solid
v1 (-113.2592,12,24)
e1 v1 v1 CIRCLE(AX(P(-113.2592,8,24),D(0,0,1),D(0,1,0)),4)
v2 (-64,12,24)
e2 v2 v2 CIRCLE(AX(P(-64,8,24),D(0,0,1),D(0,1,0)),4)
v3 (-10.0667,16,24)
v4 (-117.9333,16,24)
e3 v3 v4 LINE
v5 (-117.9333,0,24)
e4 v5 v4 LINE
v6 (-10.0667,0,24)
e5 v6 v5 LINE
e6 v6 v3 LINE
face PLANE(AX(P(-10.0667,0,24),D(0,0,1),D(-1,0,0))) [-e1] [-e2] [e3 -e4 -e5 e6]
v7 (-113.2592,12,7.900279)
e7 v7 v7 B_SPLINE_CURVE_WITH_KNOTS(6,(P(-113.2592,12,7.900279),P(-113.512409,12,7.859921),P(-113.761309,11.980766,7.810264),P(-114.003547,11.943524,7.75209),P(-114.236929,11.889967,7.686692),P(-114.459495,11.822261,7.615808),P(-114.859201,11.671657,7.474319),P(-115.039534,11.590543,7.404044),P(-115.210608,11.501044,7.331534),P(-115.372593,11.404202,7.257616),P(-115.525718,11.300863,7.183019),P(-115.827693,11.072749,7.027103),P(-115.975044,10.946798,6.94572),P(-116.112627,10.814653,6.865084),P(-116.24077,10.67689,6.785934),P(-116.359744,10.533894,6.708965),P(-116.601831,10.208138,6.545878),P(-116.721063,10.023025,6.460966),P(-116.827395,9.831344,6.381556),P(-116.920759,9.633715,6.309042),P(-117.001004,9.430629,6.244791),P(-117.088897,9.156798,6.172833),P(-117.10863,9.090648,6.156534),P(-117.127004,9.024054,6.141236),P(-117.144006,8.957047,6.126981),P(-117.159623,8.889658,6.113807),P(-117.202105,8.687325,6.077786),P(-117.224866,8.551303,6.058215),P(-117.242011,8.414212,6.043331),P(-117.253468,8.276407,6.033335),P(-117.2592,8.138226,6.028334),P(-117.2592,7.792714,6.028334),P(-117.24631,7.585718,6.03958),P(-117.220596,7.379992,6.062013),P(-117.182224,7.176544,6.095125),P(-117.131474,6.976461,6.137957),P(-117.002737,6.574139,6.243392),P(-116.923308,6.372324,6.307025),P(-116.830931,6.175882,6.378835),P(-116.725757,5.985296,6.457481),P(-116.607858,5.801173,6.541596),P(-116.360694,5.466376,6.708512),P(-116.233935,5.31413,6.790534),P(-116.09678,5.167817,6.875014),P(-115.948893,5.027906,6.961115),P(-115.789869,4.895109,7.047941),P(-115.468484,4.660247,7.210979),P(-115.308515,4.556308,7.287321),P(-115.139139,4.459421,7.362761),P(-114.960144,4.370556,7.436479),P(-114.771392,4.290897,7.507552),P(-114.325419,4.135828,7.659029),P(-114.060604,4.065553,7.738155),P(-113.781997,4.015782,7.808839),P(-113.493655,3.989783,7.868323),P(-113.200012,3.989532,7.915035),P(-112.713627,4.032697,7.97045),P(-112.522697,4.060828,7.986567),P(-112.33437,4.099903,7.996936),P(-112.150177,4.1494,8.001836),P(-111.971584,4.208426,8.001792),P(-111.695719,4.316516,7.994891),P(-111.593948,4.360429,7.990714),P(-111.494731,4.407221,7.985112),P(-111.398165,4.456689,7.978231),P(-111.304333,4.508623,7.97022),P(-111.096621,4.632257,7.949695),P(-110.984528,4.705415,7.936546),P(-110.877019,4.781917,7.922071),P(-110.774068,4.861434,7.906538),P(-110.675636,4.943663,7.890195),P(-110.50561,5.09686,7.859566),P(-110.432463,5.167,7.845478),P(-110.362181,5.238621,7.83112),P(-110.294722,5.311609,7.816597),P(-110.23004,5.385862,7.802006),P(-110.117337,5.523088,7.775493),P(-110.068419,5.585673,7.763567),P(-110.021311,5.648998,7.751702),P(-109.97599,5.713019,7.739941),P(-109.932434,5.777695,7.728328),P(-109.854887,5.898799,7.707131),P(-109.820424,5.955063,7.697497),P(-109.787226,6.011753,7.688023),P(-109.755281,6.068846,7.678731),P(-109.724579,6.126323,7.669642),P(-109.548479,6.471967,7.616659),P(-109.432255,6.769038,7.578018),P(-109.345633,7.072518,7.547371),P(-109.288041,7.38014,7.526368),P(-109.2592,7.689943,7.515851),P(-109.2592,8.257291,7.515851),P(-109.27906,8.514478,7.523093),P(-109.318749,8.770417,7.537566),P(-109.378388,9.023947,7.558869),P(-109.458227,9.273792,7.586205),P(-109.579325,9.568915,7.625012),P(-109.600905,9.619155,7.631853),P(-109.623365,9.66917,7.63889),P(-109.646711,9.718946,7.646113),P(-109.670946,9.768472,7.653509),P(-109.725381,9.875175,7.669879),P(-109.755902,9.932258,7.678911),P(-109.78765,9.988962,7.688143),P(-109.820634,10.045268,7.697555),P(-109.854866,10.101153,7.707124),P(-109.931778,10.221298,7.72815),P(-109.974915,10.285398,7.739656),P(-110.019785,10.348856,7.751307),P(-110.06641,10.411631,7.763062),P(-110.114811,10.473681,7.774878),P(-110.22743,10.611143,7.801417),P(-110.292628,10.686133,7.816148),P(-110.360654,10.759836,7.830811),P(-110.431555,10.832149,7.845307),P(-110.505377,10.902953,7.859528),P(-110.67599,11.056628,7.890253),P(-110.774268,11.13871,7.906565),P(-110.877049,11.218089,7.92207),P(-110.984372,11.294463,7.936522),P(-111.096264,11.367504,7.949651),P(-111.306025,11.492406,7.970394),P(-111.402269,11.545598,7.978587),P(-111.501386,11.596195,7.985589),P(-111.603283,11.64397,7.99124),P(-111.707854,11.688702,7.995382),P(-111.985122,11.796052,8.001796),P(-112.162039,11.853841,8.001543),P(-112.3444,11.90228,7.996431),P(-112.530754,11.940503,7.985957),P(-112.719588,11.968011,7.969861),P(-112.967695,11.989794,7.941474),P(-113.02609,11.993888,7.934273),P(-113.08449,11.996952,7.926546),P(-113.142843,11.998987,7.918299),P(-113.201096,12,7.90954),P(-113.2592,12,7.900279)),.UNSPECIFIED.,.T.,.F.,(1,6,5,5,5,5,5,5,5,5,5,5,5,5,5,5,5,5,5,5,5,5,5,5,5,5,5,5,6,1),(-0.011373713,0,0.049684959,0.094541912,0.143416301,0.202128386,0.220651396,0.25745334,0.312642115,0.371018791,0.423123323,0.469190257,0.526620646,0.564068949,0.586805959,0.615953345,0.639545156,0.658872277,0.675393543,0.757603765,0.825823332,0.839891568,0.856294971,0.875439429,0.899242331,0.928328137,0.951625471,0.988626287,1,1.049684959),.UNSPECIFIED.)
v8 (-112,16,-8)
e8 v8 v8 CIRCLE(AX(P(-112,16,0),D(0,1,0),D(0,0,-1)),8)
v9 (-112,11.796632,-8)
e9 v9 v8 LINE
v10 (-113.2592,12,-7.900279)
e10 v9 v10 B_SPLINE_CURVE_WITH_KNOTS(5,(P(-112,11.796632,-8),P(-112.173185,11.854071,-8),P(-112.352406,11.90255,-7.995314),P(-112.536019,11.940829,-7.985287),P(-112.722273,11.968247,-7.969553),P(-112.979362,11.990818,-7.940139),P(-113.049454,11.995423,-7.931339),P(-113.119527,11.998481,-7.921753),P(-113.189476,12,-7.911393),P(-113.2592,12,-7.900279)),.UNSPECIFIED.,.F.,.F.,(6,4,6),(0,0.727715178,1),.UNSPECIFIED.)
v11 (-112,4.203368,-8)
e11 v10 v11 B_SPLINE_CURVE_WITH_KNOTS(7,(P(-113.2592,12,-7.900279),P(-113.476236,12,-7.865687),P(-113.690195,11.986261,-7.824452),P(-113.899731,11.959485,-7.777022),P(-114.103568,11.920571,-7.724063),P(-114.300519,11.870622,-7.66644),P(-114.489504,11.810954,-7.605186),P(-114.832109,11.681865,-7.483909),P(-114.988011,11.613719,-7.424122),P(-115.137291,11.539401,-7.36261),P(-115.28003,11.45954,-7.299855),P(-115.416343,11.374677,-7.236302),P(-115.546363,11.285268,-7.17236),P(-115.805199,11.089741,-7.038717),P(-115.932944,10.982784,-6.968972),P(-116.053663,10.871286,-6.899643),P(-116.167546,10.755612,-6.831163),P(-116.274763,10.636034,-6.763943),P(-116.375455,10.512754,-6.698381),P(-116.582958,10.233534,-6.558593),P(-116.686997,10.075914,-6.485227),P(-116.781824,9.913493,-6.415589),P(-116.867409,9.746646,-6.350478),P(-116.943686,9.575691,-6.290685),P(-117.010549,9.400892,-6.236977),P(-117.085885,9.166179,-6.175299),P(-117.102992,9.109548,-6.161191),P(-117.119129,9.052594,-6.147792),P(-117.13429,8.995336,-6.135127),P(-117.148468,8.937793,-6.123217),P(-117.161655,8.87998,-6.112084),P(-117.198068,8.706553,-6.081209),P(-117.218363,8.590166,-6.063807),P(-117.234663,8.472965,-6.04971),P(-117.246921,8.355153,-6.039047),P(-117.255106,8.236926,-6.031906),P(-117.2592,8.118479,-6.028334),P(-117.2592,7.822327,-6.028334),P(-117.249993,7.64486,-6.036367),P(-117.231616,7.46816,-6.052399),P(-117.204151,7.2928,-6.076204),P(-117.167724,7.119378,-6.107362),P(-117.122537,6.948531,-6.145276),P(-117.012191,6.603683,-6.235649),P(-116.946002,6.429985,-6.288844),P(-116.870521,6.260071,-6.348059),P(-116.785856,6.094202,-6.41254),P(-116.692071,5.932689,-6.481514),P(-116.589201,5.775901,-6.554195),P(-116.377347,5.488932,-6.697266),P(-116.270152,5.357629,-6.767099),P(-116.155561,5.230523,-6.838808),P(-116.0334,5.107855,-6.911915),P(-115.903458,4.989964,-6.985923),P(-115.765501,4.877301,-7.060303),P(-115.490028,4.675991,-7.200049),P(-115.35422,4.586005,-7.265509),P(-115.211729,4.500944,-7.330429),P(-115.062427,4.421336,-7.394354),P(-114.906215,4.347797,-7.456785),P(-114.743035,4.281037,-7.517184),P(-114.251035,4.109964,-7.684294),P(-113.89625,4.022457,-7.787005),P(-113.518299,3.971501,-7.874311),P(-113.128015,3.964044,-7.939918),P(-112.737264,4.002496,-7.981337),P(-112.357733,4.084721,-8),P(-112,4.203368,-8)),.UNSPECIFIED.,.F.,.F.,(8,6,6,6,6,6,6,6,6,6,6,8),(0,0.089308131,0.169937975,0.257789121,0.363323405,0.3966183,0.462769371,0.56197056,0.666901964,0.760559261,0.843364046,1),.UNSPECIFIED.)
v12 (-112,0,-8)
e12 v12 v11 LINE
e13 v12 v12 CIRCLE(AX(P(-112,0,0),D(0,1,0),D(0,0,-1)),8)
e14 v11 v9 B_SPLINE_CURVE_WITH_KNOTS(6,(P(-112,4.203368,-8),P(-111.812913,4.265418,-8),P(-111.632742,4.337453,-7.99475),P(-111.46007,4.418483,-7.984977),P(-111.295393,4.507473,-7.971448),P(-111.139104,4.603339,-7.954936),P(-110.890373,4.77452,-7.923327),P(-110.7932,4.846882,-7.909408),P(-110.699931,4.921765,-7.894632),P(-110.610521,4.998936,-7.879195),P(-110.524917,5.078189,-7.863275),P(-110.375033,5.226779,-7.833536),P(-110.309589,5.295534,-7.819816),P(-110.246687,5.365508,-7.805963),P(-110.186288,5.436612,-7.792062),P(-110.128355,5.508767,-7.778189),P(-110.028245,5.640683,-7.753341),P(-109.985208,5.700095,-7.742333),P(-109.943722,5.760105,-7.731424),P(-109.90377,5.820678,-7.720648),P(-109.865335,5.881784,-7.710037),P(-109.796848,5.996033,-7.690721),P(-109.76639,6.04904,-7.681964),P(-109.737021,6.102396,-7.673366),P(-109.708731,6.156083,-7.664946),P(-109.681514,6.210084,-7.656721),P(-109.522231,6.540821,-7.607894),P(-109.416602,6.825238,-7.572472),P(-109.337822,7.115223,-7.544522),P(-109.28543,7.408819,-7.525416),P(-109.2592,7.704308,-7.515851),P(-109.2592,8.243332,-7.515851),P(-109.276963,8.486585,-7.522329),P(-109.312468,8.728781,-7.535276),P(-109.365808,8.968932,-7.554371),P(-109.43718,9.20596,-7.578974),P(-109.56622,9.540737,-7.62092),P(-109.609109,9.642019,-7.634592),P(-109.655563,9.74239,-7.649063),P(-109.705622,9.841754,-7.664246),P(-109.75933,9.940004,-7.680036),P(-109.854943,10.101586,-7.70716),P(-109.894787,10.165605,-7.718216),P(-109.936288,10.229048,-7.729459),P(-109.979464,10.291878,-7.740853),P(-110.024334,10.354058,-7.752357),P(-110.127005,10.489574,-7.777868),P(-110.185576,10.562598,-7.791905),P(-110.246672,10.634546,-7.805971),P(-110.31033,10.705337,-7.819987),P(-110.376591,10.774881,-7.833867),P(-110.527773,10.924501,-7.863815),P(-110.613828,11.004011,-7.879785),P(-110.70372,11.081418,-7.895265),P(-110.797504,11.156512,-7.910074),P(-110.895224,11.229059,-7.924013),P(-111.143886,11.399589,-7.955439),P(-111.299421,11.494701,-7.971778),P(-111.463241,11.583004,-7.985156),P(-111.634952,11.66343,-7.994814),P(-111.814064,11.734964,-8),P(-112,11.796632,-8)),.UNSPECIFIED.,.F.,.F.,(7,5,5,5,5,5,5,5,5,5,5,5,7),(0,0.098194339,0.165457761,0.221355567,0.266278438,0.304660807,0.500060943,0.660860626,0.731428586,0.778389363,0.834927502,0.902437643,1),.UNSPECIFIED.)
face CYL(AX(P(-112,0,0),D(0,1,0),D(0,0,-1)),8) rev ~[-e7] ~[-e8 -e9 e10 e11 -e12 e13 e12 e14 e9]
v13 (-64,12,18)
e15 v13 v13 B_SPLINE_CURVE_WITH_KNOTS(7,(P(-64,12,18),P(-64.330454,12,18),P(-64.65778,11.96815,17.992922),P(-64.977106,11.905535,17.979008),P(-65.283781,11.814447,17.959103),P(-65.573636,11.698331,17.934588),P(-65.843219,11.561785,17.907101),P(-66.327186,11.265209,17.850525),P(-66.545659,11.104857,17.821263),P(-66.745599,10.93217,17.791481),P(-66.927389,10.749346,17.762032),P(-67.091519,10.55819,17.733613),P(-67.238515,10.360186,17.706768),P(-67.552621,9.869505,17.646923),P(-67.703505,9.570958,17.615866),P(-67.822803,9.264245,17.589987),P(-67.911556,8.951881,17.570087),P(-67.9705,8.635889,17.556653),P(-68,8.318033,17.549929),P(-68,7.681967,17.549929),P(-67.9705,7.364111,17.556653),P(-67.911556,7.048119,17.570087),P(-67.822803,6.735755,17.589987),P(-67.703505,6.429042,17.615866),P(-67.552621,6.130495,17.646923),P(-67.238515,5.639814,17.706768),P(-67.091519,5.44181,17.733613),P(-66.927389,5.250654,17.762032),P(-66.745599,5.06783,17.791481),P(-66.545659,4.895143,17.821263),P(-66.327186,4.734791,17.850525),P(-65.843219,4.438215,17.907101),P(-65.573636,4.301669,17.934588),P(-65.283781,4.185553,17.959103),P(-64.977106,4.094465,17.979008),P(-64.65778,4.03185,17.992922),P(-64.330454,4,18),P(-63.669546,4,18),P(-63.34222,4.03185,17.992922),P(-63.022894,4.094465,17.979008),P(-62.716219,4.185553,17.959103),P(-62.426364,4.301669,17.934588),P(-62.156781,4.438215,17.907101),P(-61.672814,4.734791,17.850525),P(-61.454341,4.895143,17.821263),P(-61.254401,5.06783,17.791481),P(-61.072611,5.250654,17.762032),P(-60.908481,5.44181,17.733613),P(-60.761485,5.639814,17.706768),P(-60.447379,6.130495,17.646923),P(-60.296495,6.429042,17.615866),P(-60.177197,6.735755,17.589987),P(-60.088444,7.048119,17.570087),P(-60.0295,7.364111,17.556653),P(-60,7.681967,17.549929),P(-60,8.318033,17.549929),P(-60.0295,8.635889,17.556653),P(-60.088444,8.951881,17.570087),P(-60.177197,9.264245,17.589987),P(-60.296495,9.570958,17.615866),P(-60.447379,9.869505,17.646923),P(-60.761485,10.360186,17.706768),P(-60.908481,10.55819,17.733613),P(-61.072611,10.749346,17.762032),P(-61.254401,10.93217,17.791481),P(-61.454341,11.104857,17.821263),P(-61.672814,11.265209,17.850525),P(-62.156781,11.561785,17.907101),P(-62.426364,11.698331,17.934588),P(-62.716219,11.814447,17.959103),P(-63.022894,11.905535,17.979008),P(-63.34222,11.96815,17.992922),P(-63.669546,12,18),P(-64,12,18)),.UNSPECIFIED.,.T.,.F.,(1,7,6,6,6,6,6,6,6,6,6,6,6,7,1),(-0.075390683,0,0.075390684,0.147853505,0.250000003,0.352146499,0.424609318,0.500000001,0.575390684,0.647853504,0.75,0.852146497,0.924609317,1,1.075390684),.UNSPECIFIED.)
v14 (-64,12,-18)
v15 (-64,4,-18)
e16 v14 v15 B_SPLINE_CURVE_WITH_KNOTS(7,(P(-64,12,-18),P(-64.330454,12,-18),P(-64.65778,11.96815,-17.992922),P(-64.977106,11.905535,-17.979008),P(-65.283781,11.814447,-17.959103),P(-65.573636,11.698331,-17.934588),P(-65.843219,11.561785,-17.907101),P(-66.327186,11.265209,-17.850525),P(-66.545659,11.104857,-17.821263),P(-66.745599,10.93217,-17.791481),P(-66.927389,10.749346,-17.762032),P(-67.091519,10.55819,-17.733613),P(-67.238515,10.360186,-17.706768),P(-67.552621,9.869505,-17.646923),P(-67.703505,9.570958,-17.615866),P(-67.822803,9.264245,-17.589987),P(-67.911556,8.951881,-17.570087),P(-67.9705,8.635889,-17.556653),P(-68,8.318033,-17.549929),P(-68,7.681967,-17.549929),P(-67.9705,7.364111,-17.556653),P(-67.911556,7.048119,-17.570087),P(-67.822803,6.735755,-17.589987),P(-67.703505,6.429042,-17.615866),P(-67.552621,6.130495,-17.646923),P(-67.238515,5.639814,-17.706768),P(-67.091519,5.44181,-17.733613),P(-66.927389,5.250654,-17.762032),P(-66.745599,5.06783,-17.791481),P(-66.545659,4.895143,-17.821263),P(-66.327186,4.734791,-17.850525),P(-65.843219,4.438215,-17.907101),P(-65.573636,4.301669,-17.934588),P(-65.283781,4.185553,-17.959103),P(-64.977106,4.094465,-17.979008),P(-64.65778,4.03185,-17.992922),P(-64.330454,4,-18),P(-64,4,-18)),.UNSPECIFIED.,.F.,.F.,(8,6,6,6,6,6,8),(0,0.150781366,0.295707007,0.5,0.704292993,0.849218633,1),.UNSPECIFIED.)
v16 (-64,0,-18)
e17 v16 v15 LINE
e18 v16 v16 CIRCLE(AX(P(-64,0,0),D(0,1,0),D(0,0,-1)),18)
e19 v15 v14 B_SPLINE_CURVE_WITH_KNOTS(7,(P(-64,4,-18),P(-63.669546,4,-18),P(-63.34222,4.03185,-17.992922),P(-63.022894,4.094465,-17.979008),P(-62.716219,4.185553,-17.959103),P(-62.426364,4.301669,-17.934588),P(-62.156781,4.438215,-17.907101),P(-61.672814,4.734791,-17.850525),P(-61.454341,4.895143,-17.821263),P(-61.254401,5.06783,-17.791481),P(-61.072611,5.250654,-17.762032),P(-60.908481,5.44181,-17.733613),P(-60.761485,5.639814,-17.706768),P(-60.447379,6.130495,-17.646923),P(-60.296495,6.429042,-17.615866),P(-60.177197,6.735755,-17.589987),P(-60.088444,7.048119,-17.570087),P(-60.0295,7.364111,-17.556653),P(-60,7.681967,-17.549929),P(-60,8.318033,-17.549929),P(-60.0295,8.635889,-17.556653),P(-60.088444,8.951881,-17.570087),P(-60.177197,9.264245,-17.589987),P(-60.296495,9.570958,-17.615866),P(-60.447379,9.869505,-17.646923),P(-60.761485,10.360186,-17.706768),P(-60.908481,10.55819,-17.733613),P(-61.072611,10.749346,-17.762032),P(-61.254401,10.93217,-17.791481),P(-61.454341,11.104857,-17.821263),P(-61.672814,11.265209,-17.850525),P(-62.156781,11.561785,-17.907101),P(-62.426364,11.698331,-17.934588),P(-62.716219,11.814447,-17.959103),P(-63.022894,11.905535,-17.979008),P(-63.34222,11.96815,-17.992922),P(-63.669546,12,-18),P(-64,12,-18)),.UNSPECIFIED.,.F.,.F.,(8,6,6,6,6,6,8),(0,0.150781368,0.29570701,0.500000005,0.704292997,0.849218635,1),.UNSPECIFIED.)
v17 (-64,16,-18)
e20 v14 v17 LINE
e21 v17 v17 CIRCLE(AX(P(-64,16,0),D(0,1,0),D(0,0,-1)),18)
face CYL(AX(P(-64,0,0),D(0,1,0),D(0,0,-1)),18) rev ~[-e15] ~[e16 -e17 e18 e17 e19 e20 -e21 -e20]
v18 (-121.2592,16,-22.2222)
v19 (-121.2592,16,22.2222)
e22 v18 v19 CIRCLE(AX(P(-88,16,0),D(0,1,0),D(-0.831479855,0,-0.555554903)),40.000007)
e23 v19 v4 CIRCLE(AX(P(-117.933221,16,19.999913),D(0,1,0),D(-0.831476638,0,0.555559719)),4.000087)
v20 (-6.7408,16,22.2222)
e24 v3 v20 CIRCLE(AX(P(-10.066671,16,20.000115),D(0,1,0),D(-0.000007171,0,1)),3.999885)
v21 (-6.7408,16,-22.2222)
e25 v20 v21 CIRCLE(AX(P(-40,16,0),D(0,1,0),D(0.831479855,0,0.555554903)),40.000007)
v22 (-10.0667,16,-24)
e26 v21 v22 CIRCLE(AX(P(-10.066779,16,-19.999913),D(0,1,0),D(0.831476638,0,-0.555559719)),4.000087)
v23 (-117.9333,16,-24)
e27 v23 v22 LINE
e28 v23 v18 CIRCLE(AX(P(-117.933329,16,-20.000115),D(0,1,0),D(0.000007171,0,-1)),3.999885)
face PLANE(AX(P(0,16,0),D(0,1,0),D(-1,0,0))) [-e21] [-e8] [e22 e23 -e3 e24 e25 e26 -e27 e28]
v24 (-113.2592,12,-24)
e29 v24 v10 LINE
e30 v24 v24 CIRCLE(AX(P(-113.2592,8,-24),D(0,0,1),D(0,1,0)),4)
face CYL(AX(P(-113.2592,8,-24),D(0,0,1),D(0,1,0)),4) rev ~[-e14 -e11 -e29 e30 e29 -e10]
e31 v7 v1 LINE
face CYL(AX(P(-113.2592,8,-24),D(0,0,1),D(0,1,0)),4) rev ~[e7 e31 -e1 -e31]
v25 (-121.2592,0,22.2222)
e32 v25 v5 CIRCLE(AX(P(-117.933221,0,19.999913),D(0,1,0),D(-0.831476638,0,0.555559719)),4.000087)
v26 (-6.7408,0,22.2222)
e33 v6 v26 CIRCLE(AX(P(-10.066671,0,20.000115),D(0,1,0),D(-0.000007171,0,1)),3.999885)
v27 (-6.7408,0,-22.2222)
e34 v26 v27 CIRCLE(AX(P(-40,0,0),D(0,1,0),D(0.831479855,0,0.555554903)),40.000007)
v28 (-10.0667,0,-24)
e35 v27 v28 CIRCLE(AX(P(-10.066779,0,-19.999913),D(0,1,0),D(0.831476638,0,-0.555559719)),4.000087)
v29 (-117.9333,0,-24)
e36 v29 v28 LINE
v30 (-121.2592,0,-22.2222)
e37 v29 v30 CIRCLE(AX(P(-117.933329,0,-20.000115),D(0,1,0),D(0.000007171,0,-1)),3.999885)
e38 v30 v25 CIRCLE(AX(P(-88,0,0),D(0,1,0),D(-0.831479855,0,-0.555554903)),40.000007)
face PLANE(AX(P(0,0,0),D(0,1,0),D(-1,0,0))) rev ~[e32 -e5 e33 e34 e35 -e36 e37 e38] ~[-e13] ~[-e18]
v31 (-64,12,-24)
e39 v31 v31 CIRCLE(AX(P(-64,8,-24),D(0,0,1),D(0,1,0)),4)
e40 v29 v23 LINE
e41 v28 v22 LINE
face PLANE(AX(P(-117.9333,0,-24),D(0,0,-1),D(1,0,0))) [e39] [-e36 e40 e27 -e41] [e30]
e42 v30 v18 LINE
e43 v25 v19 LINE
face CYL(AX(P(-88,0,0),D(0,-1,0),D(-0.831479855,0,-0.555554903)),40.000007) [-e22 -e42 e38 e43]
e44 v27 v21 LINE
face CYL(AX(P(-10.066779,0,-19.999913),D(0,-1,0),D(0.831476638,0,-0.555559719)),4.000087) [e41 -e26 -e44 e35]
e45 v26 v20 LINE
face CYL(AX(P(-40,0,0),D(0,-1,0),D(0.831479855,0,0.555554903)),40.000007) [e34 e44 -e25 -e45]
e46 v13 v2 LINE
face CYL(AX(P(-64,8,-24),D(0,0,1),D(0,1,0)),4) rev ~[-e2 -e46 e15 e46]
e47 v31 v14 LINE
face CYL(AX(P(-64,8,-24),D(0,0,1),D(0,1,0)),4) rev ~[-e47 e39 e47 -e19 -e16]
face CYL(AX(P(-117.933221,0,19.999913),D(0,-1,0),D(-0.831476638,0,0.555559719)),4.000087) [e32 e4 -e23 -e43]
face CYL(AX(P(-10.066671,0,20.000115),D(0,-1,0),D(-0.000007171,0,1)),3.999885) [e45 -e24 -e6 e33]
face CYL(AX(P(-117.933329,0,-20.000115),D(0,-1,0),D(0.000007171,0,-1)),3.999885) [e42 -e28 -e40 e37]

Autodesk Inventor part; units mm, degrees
ref_plane "YZ Plane" through (0, 0, 0) normal (1, 0, 0) x (0, 1, 0)
ref_plane "XZ Plane" through (0, 0, 0) normal (0, 1, 0) x (-1, 0, 0)
ref_plane "XY Plane" through (0, 0, 0) normal (0, 0, 1) x (1, 0, 0)
sketch "Skizze1" plane through (0, 0, 0) normal (0, 1, 0) x (-1, 0, 0)
  line L0 (10.0667, 24) -> (117.9333, 24)
  line L1 (117.9333, -24) -> (10.0667, -24)
  line L2 (0, 0) -> (128, 0) construction
  arc A0 (6.7408, 22.2222) -> (6.7408, -22.2222) centre (40, 0) ccw
  arc A1 (121.2592, -22.2222) -> (121.2592, 22.2222) centre (88, 0) ccw
  arc A2 (121.2592, 22.2222) -> (117.9333, 24) centre (117.9333, 20) ccw
  arc A3 (117.9333, -24) -> (121.2592, -22.2222) centre (117.9333, -20) ccw
  arc A4 (6.7408, -22.2222) -> (10.0667, -24) centre (10.0667, -20) ccw
  arc A5 (10.0667, 24) -> (6.7408, 22.2222) centre (10.0667, 20) ccw
  point P0 (120, -24)
  point P1 (120, -24)
  point P2 (120, -24)
  point P3 (120, 24)
  point P4 (120, 24)
  point P5 (120, 24)
  point P6 (8, -24)
  point P7 (8, -24)
  point P8 (8, -24)
  point P9 (8, 24)
  point P10 (8, 24)
  point P11 (8, 24)
  point P12 (128, 0)
  dimension "d1" = 0
  dimension "d3" = 0
  dimension "d2" = 48
  dimension "d24" = 128
  dimension "d25" = 4
  dimension "d26" = 40
  dimension "d27" = 40
extrude "Extrusion1" add sketch "Skizze1" along normal blind 16
sketch "Skizze2" plane through (0, 0, 0) normal (0, 1, 0) x (1, 0, 0)
  line L0 (-117.9333, -24) -> (-10.0667, -24) projected
  arc A0 (-121.2592, 22.2222) -> (-121.2592, -22.2222) centre (-88, 0) ccw projected
  point P0 (0, 0)
  point P1 (-64, 0)
  point P2 (2, 0)
  point P3 (-112, 0)
  point P4 (2, 0)
  point P5 (-128, 0)
  point P6 (-64, -24)
  dimension "d29" = 48
hole "Bohrung1" at (-64, 0, 0) direction (0, 1, 0) diameter 36 depth 16
hole "Bohrung2" at (-112, 0, 0) direction (0, 1, 0) diameter 16 depth 16
sketch "Skizze3" plane through (-10.0667, 0, -24) normal (0, 0, -1) x (-1, 0, 0)
  line L0 (0, 0) -> (0, 16) projected
  line L1 (111.1924, 0) -> (111.1924, 16) projected
  line L2 (0, 0) -> (107.8665, 0) projected
  point P0 (-10.0667, 0)
  point P1 (103.1924, 8)
  point P2 (0, 8)
  point P3 (53.9333, 8)
  point P4 (53.9333, 0)
  dimension "d37" = 8
hole "Bohrung3" at (-113.2592, 8, -24) direction (0, 0, 1) diameter 8 end through all
hole "Bohrung4" at (-64, 8, -24) direction (0, 0, 1) diameter 8 end through all
properties part number "wheel_support"
